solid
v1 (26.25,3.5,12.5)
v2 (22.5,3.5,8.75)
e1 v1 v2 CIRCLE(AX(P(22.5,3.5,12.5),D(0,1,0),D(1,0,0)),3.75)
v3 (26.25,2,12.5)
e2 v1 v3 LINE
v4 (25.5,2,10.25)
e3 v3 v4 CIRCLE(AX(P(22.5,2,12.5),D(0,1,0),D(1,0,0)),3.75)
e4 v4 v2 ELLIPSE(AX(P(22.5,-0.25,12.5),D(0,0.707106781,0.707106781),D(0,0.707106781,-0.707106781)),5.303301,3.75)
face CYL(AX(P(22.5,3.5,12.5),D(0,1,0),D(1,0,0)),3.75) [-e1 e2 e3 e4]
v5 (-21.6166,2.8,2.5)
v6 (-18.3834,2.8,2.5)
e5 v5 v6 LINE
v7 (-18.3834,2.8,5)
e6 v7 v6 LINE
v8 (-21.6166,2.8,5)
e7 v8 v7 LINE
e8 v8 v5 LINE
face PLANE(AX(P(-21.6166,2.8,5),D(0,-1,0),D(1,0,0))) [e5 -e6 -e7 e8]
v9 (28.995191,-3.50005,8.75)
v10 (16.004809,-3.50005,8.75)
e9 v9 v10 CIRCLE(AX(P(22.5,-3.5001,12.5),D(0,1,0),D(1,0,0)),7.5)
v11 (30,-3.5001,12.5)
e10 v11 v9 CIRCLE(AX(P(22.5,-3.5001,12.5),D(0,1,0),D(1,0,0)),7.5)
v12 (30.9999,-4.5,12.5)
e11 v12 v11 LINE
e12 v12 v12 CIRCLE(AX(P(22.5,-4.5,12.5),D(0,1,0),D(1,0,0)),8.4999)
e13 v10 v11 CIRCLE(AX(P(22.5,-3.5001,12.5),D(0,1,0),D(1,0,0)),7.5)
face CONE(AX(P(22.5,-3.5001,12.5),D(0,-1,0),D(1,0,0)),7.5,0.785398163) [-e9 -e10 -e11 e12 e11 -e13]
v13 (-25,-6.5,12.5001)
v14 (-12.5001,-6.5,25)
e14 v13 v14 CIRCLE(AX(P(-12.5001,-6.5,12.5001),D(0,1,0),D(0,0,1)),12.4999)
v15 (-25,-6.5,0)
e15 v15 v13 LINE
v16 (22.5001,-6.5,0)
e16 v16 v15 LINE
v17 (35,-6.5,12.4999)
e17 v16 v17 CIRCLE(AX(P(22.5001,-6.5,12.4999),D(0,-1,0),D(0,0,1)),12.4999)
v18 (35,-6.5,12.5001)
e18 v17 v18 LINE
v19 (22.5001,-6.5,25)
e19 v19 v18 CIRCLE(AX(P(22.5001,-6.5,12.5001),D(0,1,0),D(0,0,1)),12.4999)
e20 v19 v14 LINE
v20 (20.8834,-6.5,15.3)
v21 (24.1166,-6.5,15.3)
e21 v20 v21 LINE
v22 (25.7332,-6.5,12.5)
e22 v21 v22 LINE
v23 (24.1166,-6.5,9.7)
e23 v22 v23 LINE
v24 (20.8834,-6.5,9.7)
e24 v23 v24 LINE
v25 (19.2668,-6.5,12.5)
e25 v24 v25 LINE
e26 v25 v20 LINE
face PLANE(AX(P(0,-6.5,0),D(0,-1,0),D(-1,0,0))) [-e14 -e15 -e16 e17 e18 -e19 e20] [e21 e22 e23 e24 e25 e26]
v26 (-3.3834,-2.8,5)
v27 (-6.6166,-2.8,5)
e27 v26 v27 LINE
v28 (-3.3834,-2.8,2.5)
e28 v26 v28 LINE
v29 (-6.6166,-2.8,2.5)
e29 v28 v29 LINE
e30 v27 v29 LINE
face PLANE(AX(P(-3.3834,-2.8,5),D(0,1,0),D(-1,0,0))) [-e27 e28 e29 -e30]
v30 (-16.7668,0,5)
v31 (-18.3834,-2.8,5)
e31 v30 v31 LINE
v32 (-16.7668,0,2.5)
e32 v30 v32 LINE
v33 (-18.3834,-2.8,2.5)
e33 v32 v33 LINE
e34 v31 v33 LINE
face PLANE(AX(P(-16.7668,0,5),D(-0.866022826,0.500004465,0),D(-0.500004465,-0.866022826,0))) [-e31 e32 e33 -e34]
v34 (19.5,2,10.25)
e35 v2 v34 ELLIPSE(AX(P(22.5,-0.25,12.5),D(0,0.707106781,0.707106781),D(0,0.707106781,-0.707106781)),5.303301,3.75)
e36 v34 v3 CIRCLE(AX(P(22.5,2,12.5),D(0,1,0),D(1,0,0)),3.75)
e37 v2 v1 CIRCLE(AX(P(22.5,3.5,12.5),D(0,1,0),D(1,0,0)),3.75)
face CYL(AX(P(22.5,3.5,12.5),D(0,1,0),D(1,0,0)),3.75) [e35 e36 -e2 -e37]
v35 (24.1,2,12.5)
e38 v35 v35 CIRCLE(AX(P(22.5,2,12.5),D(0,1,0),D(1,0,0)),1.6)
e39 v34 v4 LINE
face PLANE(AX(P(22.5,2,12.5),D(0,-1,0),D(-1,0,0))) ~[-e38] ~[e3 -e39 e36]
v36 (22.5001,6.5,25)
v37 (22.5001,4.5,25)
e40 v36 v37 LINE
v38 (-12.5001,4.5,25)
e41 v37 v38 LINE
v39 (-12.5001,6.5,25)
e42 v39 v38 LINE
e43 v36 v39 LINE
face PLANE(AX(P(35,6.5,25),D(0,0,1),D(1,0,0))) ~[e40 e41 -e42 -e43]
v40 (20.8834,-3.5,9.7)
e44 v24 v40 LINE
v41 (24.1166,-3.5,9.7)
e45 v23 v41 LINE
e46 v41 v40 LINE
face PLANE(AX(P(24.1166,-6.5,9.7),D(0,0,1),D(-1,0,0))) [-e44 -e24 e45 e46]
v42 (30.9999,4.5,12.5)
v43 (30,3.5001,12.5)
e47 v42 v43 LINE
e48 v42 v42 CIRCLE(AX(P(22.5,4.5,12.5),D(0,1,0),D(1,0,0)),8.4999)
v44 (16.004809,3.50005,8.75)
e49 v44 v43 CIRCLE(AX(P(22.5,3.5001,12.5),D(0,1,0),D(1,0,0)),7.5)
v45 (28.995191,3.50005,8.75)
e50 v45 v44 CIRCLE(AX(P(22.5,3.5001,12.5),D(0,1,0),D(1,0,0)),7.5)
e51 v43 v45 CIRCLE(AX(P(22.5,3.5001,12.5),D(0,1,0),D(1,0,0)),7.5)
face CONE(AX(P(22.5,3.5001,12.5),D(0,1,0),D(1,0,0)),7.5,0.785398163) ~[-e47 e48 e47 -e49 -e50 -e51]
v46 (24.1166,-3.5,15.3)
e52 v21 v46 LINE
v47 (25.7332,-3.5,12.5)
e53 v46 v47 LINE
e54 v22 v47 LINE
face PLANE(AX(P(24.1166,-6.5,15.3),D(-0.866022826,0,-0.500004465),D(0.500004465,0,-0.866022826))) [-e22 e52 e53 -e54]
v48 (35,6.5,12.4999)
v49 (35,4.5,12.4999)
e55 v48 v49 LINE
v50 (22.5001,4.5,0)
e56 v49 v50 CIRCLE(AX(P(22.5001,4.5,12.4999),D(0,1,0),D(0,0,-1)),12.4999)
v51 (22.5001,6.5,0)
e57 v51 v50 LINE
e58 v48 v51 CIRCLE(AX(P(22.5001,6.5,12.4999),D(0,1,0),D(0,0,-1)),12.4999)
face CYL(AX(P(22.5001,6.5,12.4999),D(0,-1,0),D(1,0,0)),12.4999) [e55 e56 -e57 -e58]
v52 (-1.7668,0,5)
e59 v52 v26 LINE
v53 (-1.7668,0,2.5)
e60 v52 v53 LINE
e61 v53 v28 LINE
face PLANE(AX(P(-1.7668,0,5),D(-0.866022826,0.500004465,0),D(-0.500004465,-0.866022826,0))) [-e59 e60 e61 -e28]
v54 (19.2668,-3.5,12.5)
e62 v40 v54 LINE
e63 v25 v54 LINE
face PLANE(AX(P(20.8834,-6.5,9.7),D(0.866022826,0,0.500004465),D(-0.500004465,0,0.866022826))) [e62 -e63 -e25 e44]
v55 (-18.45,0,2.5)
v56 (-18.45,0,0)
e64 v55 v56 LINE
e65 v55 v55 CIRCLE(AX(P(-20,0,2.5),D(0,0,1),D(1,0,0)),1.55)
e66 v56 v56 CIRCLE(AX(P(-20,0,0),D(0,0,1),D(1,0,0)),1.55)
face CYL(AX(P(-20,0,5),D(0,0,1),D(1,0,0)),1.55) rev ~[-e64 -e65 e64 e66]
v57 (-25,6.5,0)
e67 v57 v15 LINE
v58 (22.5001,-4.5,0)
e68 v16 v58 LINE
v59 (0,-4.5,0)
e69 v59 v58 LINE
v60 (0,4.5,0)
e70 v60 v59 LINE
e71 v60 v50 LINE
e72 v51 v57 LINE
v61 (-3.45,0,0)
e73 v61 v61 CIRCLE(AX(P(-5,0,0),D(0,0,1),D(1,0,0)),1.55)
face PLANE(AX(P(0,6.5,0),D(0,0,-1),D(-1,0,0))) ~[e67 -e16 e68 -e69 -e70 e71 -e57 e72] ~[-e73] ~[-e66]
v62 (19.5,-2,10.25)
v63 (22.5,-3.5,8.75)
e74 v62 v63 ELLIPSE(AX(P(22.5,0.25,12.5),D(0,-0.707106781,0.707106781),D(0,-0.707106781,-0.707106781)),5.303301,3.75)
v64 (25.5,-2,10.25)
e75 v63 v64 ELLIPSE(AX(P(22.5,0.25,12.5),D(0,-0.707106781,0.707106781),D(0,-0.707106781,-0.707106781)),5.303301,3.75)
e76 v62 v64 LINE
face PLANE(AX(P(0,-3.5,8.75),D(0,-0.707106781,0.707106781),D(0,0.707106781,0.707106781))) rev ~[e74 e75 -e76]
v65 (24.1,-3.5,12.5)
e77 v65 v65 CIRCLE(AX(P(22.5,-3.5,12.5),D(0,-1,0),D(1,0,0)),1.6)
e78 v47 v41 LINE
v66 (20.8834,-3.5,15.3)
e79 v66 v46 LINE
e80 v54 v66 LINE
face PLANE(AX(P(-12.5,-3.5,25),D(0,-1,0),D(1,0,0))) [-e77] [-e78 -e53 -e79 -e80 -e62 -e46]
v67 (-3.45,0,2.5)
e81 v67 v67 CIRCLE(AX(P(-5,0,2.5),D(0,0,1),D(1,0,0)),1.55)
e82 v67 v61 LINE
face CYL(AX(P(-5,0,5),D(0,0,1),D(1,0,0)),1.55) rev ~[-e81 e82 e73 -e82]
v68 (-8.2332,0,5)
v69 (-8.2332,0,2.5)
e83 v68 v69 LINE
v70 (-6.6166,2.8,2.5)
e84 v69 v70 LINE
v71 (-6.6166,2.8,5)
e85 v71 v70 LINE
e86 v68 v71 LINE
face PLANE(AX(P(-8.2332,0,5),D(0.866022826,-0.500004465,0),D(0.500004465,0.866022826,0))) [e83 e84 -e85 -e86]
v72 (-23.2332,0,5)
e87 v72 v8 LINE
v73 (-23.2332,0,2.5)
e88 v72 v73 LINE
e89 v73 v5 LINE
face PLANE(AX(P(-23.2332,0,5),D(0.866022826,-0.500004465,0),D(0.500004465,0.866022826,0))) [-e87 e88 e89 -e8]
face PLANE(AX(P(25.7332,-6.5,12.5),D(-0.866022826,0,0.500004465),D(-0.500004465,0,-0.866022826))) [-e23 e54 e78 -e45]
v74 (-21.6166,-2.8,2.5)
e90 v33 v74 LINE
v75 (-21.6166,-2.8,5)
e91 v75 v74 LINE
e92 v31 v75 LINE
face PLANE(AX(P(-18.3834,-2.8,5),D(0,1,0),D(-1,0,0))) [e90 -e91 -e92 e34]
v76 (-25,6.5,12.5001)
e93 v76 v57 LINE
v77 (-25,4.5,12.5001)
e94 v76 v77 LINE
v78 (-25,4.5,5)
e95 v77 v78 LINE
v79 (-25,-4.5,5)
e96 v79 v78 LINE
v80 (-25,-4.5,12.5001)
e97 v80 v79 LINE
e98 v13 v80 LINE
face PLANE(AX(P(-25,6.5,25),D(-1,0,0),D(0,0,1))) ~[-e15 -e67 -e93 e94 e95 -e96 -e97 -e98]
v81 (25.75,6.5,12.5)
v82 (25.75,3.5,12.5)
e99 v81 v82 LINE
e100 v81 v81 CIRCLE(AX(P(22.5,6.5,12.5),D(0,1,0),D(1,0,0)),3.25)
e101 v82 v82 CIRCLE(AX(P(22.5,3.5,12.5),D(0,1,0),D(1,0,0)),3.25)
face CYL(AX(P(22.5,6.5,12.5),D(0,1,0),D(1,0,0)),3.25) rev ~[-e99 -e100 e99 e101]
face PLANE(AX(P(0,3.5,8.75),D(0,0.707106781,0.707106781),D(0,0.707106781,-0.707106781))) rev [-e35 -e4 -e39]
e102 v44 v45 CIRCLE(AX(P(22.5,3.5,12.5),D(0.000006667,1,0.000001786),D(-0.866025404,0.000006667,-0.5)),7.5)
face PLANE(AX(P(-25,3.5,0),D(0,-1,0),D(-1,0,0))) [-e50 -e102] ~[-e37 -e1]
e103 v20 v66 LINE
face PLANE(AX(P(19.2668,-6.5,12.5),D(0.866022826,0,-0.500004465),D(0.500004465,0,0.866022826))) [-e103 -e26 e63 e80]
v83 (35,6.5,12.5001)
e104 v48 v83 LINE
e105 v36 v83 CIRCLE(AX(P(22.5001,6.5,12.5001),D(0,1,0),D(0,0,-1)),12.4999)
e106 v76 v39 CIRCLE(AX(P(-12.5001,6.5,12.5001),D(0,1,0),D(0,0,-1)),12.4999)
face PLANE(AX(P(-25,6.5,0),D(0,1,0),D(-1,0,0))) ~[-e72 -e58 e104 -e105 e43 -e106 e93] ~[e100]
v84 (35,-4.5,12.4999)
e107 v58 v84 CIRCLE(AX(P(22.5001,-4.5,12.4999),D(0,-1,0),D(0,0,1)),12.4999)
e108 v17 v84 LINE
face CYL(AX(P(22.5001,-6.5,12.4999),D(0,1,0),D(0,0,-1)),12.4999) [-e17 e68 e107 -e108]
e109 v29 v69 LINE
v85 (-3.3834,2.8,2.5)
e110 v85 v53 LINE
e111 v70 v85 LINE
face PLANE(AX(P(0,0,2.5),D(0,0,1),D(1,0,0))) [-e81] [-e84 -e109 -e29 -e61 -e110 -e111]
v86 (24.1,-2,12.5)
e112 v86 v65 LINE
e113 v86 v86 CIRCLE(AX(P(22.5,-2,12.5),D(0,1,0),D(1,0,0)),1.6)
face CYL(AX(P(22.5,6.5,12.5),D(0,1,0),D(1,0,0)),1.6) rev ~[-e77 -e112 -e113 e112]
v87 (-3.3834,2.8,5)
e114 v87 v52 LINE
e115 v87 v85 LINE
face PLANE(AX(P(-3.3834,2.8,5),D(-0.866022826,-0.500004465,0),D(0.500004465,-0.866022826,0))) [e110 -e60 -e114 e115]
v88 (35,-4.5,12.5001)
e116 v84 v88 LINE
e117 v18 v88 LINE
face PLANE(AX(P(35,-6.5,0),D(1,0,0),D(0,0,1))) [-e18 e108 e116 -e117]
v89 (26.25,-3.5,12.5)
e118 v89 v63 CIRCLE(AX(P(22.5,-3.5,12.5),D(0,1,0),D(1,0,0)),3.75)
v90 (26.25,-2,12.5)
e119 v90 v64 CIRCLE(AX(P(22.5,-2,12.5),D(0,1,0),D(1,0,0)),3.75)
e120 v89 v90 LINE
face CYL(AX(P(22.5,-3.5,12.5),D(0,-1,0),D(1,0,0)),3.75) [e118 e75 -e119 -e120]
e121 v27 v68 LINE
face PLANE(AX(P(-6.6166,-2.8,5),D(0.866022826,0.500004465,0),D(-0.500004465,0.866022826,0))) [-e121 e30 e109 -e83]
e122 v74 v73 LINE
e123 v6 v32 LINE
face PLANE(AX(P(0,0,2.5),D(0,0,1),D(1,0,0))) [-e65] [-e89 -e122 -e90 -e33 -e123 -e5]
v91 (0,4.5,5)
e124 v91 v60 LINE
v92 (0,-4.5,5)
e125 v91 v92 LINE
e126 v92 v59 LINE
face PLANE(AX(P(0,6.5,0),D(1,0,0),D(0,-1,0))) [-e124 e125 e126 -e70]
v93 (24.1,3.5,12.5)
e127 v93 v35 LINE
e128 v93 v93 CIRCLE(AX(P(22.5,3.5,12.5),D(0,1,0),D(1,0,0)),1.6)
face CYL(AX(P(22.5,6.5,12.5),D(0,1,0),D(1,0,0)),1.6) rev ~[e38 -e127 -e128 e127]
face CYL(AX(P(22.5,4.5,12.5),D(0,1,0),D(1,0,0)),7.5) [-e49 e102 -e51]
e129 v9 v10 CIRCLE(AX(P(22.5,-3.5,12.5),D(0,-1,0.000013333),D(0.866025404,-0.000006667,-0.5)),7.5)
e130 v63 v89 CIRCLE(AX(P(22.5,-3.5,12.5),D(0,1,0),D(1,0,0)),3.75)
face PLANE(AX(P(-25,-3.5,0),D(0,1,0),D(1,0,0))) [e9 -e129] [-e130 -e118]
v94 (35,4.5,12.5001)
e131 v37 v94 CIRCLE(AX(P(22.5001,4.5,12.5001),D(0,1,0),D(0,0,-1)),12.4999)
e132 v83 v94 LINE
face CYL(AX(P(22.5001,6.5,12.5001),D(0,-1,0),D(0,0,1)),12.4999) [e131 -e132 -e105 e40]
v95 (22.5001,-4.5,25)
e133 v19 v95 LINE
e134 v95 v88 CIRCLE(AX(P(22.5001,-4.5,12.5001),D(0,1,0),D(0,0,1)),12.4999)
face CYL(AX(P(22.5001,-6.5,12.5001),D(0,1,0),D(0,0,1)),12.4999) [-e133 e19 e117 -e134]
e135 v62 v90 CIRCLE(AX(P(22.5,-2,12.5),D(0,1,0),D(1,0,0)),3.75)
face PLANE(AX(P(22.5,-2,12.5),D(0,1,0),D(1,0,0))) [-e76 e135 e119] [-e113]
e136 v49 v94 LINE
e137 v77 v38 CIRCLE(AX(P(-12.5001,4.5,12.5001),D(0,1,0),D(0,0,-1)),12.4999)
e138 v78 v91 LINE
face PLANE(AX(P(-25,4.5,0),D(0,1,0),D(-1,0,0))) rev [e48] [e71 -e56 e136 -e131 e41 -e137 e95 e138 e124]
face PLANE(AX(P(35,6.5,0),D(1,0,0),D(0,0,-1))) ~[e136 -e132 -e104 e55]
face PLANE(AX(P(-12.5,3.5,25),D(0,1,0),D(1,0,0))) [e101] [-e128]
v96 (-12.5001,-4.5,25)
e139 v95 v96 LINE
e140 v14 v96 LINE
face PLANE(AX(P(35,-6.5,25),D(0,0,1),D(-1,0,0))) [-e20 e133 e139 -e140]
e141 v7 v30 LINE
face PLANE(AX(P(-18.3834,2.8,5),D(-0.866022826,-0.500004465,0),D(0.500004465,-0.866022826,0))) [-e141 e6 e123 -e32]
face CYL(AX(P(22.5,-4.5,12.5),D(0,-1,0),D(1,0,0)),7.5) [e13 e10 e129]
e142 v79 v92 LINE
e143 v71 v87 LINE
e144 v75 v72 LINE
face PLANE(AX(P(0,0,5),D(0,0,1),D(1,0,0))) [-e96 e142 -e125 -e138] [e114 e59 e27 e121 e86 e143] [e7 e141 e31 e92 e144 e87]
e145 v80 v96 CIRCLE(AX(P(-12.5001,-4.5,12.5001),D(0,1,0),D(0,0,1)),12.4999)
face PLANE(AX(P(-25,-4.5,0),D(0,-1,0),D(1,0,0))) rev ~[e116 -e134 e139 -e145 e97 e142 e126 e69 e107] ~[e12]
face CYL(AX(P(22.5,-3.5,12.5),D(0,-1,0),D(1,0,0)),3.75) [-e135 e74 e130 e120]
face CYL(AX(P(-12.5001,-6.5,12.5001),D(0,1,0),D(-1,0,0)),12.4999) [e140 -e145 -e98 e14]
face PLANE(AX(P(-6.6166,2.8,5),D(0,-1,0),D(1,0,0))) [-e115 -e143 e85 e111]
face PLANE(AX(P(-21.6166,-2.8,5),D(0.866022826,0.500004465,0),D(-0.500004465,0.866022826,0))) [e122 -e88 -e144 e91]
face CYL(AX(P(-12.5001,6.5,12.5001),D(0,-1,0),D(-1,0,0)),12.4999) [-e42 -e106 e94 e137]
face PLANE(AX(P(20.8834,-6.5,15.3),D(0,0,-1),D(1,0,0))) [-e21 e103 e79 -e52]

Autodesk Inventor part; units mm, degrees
ref_plane "YZ Plane" through (0, 0, 0) normal (1, 0, 0) x (0, 1, 0)
ref_plane "XZ Plane" through (0, 0, 0) normal (0, 1, 0) x (-1, 0, 0)
ref_plane "XY Plane" through (0, 0, 0) normal (0, 0, 1) x (1, 0, 0)
sketch "Sketch1" plane through (0, 0, 0) normal (0, 0, 1) x (1, 0, 0)
  line L0 (-25, 6.5) -> (0, 6.5)
  line L1 (0, 6.5) -> (0, -6.5)
  line L2 (0, -6.5) -> (-25, -6.5)
  line L3 (-25, -6.5) -> (-25, 6.5)
  point P0 (0, 0)
  point P1 (0, 0)
  dimension "d0" = 13
  dimension "d2" = 25
extrude "Extrusion1" add sketch "Sketch1" along normal blind 5
sketch "Sketch2" plane through (-25, -6.5, 0) normal (0, -1, 0) x (1, 0, 0)
  line L0 (25, 0) -> (25, 5) projected
  line L1 (0, 0) -> (60, 0)
  line L2 (60, 0) -> (60, 25)
  line L3 (60, 25) -> (0, 25)
  line L4 (0, 25) -> (0, 0)
  dimension "d5" = 35
  dimension "d6" = 25
extrude "Extrusion2" add sketch "Sketch2" against normal blind 2
fillet "Fillet1" radius 12.5 3 edges at (35, -5.5, 0) (35, -5.5, 25) (-25, -5.5, 25)
sketch "Sketch4" plane through (-25, -4.5, 0) normal (0, 1, 0) x (1, 0, 0)
  arc A0 (47.5, -25) -> (47.5, 0) centre (47.5, -12.5) ccw projected
  circle A1 centre (47.5, -12.5) radius 7.5
  dimension "d10" = 15
extrude "Extrusion3" add sketch "Sketch4" along normal blind 1
chamfer "Chamfer1" distance 1 angle 45 1 edges at (15, -4.5, 12.5)
sketch "Sketch5" plane through (22.5, -3.5, 12.5) normal (0, 1, 0) x (1, 0, 0)
  circle A0 centre (0, 0) radius 7.5 projected
  circle A1 centre (0, 0) radius 3.75
  point P0 (-22.5, 12.5)
  dimension "d17" = 7.5
extrude "Extrusion4" add sketch "Sketch5" along normal blind 1.5 contours A1
sketch "Sketch6" plane through (0, 6.5, 5) normal (1, 0, 0) x (0, 0, -1)
  line L0 (-3.75, -8.5) -> (-11.25, -8.5) projected
  line L1 (-11.25, -10) -> (-3.75, -10) projected
  line L2 (-3.75, -10) -> (-5.25, -8.5)
  line L3 (-3.75, -8.5) -> (-3.75, -10)
  line L4 (-3.75, -8.5) -> (-5.25, -8.5)
  point P0 (5, -6.5)
extrude "Extrusion5" cut sketch "Sketch6" along normal through all
mirror "Mirror1" about plane through (0, 0, 0) normal (0, 1, 0) of "Extrusion4", "Extrusion3", "Chamfer1", "Fillet1", "Extrusion2", "Extrusion5"
sketch "Sketch7" plane through (0, 0, 5) normal (0, 0, 1) x (1, 0, 0)
  line L0 (-25, 4.5) -> (-25, -4.5) projected
  line L1 (0, -4.5) -> (0, 4.5) projected
  line L2 (-25, 0) -> (0, 0)
  circle A0 centre (-20, 0) radius 1.55
  circle A1 centre (-5, 0) radius 1.55
  dimension "d23" = 5
  dimension "d24" = 5
  dimension "d25" = 3.1
extrude "Extrusion6" cut sketch "Sketch7" against normal through all
sketch "Sketch8" plane through (0, 0, 5) normal (0, 0, 1) x (1, 0, 0)
  circle A0 centre (-5, 0) radius 1.55 projected
  circle A1 centre (-20, 0) radius 1.55 projected
  line L0 (-16.7668, 0) -> (-18.3834, -2.8)
  line L1 (-18.3834, -2.8) -> (-21.6166, -2.8)
  line L2 (-21.6166, -2.8) -> (-23.2332, 0)
  line L3 (-23.2332, 0) -> (-21.6166, 2.8)
  line L4 (-21.6166, 2.8) -> (-18.3834, 2.8)
  line L5 (-18.3834, 2.8) -> (-16.7668, 0)
  line L6 (-8.2332, 0) -> (-6.6166, 2.8)
  line L7 (-6.6166, 2.8) -> (-3.3834, 2.8)
  line L8 (-3.3834, 2.8) -> (-1.7668, 0)
  line L9 (-1.7668, 0) -> (-3.3834, -2.8)
  line L10 (-3.3834, -2.8) -> (-6.6166, -2.8)
  line L11 (-6.6166, -2.8) -> (-8.2332, 0)
  point P0 (0, 0)
  dimension "d28" = 5.6
extrude "Extrusion7" cut sketch "Sketch8" against normal blind 2.5
sketch "Sketch9" plane through (-12.5, 6.5, 25) normal (0, 1, 0) x (1, 0, 0)
  arc A0 (35, 0) -> (35, 25) centre (35, 12.5) ccw projected
  circle A1 centre (35, 12.5) radius 1.6
  point P0 (12.5, 25)
  dimension "d32" = 3.2
extrude "Extrusion8" cut sketch "Sketch9" against normal through all
sketch "Sketch10" plane through (-12.5, 6.5, 25) normal (0, 1, 0) x (1, 0, 0)
  circle A0 centre (35, 12.5) radius 1.6 projected
  arc A1 (35, 0) -> (35, 25) centre (35, 12.5) ccw projected
  circle A2 centre (35, 12.5) radius 3.25
  point P0 (12.5, 25)
  dimension "d36" = 6.5
extrude "Extrusion9" cut sketch "Sketch10" against normal blind 3
sketch "Sketch11" plane through (-12.5, -6.5, 25) normal (0, -1, 0) x (1, 0, 0)
  circle A0 centre (35, -12.5) radius 1.6 projected
  arc A1 (35, -25) -> (35, 0) centre (35, -12.5) ccw projected
  line L0 (31.7668, -12.5) -> (33.3834, -9.7)
  line L1 (33.3834, -9.7) -> (36.6166, -9.7)
  line L2 (36.6166, -9.7) -> (38.2332, -12.5)
  line L3 (38.2332, -12.5) -> (36.6166, -15.3)
  line L4 (36.6166, -15.3) -> (33.3834, -15.3)
  line L5 (33.3834, -15.3) -> (31.7668, -12.5)
  point P0 (12.5, -25)
  point P1 (35, -9.7)
  dimension "d40" = 5.6
extrude "Extrusion10" cut sketch "Sketch11" against normal blind 3
properties part number "z pulley holder"
